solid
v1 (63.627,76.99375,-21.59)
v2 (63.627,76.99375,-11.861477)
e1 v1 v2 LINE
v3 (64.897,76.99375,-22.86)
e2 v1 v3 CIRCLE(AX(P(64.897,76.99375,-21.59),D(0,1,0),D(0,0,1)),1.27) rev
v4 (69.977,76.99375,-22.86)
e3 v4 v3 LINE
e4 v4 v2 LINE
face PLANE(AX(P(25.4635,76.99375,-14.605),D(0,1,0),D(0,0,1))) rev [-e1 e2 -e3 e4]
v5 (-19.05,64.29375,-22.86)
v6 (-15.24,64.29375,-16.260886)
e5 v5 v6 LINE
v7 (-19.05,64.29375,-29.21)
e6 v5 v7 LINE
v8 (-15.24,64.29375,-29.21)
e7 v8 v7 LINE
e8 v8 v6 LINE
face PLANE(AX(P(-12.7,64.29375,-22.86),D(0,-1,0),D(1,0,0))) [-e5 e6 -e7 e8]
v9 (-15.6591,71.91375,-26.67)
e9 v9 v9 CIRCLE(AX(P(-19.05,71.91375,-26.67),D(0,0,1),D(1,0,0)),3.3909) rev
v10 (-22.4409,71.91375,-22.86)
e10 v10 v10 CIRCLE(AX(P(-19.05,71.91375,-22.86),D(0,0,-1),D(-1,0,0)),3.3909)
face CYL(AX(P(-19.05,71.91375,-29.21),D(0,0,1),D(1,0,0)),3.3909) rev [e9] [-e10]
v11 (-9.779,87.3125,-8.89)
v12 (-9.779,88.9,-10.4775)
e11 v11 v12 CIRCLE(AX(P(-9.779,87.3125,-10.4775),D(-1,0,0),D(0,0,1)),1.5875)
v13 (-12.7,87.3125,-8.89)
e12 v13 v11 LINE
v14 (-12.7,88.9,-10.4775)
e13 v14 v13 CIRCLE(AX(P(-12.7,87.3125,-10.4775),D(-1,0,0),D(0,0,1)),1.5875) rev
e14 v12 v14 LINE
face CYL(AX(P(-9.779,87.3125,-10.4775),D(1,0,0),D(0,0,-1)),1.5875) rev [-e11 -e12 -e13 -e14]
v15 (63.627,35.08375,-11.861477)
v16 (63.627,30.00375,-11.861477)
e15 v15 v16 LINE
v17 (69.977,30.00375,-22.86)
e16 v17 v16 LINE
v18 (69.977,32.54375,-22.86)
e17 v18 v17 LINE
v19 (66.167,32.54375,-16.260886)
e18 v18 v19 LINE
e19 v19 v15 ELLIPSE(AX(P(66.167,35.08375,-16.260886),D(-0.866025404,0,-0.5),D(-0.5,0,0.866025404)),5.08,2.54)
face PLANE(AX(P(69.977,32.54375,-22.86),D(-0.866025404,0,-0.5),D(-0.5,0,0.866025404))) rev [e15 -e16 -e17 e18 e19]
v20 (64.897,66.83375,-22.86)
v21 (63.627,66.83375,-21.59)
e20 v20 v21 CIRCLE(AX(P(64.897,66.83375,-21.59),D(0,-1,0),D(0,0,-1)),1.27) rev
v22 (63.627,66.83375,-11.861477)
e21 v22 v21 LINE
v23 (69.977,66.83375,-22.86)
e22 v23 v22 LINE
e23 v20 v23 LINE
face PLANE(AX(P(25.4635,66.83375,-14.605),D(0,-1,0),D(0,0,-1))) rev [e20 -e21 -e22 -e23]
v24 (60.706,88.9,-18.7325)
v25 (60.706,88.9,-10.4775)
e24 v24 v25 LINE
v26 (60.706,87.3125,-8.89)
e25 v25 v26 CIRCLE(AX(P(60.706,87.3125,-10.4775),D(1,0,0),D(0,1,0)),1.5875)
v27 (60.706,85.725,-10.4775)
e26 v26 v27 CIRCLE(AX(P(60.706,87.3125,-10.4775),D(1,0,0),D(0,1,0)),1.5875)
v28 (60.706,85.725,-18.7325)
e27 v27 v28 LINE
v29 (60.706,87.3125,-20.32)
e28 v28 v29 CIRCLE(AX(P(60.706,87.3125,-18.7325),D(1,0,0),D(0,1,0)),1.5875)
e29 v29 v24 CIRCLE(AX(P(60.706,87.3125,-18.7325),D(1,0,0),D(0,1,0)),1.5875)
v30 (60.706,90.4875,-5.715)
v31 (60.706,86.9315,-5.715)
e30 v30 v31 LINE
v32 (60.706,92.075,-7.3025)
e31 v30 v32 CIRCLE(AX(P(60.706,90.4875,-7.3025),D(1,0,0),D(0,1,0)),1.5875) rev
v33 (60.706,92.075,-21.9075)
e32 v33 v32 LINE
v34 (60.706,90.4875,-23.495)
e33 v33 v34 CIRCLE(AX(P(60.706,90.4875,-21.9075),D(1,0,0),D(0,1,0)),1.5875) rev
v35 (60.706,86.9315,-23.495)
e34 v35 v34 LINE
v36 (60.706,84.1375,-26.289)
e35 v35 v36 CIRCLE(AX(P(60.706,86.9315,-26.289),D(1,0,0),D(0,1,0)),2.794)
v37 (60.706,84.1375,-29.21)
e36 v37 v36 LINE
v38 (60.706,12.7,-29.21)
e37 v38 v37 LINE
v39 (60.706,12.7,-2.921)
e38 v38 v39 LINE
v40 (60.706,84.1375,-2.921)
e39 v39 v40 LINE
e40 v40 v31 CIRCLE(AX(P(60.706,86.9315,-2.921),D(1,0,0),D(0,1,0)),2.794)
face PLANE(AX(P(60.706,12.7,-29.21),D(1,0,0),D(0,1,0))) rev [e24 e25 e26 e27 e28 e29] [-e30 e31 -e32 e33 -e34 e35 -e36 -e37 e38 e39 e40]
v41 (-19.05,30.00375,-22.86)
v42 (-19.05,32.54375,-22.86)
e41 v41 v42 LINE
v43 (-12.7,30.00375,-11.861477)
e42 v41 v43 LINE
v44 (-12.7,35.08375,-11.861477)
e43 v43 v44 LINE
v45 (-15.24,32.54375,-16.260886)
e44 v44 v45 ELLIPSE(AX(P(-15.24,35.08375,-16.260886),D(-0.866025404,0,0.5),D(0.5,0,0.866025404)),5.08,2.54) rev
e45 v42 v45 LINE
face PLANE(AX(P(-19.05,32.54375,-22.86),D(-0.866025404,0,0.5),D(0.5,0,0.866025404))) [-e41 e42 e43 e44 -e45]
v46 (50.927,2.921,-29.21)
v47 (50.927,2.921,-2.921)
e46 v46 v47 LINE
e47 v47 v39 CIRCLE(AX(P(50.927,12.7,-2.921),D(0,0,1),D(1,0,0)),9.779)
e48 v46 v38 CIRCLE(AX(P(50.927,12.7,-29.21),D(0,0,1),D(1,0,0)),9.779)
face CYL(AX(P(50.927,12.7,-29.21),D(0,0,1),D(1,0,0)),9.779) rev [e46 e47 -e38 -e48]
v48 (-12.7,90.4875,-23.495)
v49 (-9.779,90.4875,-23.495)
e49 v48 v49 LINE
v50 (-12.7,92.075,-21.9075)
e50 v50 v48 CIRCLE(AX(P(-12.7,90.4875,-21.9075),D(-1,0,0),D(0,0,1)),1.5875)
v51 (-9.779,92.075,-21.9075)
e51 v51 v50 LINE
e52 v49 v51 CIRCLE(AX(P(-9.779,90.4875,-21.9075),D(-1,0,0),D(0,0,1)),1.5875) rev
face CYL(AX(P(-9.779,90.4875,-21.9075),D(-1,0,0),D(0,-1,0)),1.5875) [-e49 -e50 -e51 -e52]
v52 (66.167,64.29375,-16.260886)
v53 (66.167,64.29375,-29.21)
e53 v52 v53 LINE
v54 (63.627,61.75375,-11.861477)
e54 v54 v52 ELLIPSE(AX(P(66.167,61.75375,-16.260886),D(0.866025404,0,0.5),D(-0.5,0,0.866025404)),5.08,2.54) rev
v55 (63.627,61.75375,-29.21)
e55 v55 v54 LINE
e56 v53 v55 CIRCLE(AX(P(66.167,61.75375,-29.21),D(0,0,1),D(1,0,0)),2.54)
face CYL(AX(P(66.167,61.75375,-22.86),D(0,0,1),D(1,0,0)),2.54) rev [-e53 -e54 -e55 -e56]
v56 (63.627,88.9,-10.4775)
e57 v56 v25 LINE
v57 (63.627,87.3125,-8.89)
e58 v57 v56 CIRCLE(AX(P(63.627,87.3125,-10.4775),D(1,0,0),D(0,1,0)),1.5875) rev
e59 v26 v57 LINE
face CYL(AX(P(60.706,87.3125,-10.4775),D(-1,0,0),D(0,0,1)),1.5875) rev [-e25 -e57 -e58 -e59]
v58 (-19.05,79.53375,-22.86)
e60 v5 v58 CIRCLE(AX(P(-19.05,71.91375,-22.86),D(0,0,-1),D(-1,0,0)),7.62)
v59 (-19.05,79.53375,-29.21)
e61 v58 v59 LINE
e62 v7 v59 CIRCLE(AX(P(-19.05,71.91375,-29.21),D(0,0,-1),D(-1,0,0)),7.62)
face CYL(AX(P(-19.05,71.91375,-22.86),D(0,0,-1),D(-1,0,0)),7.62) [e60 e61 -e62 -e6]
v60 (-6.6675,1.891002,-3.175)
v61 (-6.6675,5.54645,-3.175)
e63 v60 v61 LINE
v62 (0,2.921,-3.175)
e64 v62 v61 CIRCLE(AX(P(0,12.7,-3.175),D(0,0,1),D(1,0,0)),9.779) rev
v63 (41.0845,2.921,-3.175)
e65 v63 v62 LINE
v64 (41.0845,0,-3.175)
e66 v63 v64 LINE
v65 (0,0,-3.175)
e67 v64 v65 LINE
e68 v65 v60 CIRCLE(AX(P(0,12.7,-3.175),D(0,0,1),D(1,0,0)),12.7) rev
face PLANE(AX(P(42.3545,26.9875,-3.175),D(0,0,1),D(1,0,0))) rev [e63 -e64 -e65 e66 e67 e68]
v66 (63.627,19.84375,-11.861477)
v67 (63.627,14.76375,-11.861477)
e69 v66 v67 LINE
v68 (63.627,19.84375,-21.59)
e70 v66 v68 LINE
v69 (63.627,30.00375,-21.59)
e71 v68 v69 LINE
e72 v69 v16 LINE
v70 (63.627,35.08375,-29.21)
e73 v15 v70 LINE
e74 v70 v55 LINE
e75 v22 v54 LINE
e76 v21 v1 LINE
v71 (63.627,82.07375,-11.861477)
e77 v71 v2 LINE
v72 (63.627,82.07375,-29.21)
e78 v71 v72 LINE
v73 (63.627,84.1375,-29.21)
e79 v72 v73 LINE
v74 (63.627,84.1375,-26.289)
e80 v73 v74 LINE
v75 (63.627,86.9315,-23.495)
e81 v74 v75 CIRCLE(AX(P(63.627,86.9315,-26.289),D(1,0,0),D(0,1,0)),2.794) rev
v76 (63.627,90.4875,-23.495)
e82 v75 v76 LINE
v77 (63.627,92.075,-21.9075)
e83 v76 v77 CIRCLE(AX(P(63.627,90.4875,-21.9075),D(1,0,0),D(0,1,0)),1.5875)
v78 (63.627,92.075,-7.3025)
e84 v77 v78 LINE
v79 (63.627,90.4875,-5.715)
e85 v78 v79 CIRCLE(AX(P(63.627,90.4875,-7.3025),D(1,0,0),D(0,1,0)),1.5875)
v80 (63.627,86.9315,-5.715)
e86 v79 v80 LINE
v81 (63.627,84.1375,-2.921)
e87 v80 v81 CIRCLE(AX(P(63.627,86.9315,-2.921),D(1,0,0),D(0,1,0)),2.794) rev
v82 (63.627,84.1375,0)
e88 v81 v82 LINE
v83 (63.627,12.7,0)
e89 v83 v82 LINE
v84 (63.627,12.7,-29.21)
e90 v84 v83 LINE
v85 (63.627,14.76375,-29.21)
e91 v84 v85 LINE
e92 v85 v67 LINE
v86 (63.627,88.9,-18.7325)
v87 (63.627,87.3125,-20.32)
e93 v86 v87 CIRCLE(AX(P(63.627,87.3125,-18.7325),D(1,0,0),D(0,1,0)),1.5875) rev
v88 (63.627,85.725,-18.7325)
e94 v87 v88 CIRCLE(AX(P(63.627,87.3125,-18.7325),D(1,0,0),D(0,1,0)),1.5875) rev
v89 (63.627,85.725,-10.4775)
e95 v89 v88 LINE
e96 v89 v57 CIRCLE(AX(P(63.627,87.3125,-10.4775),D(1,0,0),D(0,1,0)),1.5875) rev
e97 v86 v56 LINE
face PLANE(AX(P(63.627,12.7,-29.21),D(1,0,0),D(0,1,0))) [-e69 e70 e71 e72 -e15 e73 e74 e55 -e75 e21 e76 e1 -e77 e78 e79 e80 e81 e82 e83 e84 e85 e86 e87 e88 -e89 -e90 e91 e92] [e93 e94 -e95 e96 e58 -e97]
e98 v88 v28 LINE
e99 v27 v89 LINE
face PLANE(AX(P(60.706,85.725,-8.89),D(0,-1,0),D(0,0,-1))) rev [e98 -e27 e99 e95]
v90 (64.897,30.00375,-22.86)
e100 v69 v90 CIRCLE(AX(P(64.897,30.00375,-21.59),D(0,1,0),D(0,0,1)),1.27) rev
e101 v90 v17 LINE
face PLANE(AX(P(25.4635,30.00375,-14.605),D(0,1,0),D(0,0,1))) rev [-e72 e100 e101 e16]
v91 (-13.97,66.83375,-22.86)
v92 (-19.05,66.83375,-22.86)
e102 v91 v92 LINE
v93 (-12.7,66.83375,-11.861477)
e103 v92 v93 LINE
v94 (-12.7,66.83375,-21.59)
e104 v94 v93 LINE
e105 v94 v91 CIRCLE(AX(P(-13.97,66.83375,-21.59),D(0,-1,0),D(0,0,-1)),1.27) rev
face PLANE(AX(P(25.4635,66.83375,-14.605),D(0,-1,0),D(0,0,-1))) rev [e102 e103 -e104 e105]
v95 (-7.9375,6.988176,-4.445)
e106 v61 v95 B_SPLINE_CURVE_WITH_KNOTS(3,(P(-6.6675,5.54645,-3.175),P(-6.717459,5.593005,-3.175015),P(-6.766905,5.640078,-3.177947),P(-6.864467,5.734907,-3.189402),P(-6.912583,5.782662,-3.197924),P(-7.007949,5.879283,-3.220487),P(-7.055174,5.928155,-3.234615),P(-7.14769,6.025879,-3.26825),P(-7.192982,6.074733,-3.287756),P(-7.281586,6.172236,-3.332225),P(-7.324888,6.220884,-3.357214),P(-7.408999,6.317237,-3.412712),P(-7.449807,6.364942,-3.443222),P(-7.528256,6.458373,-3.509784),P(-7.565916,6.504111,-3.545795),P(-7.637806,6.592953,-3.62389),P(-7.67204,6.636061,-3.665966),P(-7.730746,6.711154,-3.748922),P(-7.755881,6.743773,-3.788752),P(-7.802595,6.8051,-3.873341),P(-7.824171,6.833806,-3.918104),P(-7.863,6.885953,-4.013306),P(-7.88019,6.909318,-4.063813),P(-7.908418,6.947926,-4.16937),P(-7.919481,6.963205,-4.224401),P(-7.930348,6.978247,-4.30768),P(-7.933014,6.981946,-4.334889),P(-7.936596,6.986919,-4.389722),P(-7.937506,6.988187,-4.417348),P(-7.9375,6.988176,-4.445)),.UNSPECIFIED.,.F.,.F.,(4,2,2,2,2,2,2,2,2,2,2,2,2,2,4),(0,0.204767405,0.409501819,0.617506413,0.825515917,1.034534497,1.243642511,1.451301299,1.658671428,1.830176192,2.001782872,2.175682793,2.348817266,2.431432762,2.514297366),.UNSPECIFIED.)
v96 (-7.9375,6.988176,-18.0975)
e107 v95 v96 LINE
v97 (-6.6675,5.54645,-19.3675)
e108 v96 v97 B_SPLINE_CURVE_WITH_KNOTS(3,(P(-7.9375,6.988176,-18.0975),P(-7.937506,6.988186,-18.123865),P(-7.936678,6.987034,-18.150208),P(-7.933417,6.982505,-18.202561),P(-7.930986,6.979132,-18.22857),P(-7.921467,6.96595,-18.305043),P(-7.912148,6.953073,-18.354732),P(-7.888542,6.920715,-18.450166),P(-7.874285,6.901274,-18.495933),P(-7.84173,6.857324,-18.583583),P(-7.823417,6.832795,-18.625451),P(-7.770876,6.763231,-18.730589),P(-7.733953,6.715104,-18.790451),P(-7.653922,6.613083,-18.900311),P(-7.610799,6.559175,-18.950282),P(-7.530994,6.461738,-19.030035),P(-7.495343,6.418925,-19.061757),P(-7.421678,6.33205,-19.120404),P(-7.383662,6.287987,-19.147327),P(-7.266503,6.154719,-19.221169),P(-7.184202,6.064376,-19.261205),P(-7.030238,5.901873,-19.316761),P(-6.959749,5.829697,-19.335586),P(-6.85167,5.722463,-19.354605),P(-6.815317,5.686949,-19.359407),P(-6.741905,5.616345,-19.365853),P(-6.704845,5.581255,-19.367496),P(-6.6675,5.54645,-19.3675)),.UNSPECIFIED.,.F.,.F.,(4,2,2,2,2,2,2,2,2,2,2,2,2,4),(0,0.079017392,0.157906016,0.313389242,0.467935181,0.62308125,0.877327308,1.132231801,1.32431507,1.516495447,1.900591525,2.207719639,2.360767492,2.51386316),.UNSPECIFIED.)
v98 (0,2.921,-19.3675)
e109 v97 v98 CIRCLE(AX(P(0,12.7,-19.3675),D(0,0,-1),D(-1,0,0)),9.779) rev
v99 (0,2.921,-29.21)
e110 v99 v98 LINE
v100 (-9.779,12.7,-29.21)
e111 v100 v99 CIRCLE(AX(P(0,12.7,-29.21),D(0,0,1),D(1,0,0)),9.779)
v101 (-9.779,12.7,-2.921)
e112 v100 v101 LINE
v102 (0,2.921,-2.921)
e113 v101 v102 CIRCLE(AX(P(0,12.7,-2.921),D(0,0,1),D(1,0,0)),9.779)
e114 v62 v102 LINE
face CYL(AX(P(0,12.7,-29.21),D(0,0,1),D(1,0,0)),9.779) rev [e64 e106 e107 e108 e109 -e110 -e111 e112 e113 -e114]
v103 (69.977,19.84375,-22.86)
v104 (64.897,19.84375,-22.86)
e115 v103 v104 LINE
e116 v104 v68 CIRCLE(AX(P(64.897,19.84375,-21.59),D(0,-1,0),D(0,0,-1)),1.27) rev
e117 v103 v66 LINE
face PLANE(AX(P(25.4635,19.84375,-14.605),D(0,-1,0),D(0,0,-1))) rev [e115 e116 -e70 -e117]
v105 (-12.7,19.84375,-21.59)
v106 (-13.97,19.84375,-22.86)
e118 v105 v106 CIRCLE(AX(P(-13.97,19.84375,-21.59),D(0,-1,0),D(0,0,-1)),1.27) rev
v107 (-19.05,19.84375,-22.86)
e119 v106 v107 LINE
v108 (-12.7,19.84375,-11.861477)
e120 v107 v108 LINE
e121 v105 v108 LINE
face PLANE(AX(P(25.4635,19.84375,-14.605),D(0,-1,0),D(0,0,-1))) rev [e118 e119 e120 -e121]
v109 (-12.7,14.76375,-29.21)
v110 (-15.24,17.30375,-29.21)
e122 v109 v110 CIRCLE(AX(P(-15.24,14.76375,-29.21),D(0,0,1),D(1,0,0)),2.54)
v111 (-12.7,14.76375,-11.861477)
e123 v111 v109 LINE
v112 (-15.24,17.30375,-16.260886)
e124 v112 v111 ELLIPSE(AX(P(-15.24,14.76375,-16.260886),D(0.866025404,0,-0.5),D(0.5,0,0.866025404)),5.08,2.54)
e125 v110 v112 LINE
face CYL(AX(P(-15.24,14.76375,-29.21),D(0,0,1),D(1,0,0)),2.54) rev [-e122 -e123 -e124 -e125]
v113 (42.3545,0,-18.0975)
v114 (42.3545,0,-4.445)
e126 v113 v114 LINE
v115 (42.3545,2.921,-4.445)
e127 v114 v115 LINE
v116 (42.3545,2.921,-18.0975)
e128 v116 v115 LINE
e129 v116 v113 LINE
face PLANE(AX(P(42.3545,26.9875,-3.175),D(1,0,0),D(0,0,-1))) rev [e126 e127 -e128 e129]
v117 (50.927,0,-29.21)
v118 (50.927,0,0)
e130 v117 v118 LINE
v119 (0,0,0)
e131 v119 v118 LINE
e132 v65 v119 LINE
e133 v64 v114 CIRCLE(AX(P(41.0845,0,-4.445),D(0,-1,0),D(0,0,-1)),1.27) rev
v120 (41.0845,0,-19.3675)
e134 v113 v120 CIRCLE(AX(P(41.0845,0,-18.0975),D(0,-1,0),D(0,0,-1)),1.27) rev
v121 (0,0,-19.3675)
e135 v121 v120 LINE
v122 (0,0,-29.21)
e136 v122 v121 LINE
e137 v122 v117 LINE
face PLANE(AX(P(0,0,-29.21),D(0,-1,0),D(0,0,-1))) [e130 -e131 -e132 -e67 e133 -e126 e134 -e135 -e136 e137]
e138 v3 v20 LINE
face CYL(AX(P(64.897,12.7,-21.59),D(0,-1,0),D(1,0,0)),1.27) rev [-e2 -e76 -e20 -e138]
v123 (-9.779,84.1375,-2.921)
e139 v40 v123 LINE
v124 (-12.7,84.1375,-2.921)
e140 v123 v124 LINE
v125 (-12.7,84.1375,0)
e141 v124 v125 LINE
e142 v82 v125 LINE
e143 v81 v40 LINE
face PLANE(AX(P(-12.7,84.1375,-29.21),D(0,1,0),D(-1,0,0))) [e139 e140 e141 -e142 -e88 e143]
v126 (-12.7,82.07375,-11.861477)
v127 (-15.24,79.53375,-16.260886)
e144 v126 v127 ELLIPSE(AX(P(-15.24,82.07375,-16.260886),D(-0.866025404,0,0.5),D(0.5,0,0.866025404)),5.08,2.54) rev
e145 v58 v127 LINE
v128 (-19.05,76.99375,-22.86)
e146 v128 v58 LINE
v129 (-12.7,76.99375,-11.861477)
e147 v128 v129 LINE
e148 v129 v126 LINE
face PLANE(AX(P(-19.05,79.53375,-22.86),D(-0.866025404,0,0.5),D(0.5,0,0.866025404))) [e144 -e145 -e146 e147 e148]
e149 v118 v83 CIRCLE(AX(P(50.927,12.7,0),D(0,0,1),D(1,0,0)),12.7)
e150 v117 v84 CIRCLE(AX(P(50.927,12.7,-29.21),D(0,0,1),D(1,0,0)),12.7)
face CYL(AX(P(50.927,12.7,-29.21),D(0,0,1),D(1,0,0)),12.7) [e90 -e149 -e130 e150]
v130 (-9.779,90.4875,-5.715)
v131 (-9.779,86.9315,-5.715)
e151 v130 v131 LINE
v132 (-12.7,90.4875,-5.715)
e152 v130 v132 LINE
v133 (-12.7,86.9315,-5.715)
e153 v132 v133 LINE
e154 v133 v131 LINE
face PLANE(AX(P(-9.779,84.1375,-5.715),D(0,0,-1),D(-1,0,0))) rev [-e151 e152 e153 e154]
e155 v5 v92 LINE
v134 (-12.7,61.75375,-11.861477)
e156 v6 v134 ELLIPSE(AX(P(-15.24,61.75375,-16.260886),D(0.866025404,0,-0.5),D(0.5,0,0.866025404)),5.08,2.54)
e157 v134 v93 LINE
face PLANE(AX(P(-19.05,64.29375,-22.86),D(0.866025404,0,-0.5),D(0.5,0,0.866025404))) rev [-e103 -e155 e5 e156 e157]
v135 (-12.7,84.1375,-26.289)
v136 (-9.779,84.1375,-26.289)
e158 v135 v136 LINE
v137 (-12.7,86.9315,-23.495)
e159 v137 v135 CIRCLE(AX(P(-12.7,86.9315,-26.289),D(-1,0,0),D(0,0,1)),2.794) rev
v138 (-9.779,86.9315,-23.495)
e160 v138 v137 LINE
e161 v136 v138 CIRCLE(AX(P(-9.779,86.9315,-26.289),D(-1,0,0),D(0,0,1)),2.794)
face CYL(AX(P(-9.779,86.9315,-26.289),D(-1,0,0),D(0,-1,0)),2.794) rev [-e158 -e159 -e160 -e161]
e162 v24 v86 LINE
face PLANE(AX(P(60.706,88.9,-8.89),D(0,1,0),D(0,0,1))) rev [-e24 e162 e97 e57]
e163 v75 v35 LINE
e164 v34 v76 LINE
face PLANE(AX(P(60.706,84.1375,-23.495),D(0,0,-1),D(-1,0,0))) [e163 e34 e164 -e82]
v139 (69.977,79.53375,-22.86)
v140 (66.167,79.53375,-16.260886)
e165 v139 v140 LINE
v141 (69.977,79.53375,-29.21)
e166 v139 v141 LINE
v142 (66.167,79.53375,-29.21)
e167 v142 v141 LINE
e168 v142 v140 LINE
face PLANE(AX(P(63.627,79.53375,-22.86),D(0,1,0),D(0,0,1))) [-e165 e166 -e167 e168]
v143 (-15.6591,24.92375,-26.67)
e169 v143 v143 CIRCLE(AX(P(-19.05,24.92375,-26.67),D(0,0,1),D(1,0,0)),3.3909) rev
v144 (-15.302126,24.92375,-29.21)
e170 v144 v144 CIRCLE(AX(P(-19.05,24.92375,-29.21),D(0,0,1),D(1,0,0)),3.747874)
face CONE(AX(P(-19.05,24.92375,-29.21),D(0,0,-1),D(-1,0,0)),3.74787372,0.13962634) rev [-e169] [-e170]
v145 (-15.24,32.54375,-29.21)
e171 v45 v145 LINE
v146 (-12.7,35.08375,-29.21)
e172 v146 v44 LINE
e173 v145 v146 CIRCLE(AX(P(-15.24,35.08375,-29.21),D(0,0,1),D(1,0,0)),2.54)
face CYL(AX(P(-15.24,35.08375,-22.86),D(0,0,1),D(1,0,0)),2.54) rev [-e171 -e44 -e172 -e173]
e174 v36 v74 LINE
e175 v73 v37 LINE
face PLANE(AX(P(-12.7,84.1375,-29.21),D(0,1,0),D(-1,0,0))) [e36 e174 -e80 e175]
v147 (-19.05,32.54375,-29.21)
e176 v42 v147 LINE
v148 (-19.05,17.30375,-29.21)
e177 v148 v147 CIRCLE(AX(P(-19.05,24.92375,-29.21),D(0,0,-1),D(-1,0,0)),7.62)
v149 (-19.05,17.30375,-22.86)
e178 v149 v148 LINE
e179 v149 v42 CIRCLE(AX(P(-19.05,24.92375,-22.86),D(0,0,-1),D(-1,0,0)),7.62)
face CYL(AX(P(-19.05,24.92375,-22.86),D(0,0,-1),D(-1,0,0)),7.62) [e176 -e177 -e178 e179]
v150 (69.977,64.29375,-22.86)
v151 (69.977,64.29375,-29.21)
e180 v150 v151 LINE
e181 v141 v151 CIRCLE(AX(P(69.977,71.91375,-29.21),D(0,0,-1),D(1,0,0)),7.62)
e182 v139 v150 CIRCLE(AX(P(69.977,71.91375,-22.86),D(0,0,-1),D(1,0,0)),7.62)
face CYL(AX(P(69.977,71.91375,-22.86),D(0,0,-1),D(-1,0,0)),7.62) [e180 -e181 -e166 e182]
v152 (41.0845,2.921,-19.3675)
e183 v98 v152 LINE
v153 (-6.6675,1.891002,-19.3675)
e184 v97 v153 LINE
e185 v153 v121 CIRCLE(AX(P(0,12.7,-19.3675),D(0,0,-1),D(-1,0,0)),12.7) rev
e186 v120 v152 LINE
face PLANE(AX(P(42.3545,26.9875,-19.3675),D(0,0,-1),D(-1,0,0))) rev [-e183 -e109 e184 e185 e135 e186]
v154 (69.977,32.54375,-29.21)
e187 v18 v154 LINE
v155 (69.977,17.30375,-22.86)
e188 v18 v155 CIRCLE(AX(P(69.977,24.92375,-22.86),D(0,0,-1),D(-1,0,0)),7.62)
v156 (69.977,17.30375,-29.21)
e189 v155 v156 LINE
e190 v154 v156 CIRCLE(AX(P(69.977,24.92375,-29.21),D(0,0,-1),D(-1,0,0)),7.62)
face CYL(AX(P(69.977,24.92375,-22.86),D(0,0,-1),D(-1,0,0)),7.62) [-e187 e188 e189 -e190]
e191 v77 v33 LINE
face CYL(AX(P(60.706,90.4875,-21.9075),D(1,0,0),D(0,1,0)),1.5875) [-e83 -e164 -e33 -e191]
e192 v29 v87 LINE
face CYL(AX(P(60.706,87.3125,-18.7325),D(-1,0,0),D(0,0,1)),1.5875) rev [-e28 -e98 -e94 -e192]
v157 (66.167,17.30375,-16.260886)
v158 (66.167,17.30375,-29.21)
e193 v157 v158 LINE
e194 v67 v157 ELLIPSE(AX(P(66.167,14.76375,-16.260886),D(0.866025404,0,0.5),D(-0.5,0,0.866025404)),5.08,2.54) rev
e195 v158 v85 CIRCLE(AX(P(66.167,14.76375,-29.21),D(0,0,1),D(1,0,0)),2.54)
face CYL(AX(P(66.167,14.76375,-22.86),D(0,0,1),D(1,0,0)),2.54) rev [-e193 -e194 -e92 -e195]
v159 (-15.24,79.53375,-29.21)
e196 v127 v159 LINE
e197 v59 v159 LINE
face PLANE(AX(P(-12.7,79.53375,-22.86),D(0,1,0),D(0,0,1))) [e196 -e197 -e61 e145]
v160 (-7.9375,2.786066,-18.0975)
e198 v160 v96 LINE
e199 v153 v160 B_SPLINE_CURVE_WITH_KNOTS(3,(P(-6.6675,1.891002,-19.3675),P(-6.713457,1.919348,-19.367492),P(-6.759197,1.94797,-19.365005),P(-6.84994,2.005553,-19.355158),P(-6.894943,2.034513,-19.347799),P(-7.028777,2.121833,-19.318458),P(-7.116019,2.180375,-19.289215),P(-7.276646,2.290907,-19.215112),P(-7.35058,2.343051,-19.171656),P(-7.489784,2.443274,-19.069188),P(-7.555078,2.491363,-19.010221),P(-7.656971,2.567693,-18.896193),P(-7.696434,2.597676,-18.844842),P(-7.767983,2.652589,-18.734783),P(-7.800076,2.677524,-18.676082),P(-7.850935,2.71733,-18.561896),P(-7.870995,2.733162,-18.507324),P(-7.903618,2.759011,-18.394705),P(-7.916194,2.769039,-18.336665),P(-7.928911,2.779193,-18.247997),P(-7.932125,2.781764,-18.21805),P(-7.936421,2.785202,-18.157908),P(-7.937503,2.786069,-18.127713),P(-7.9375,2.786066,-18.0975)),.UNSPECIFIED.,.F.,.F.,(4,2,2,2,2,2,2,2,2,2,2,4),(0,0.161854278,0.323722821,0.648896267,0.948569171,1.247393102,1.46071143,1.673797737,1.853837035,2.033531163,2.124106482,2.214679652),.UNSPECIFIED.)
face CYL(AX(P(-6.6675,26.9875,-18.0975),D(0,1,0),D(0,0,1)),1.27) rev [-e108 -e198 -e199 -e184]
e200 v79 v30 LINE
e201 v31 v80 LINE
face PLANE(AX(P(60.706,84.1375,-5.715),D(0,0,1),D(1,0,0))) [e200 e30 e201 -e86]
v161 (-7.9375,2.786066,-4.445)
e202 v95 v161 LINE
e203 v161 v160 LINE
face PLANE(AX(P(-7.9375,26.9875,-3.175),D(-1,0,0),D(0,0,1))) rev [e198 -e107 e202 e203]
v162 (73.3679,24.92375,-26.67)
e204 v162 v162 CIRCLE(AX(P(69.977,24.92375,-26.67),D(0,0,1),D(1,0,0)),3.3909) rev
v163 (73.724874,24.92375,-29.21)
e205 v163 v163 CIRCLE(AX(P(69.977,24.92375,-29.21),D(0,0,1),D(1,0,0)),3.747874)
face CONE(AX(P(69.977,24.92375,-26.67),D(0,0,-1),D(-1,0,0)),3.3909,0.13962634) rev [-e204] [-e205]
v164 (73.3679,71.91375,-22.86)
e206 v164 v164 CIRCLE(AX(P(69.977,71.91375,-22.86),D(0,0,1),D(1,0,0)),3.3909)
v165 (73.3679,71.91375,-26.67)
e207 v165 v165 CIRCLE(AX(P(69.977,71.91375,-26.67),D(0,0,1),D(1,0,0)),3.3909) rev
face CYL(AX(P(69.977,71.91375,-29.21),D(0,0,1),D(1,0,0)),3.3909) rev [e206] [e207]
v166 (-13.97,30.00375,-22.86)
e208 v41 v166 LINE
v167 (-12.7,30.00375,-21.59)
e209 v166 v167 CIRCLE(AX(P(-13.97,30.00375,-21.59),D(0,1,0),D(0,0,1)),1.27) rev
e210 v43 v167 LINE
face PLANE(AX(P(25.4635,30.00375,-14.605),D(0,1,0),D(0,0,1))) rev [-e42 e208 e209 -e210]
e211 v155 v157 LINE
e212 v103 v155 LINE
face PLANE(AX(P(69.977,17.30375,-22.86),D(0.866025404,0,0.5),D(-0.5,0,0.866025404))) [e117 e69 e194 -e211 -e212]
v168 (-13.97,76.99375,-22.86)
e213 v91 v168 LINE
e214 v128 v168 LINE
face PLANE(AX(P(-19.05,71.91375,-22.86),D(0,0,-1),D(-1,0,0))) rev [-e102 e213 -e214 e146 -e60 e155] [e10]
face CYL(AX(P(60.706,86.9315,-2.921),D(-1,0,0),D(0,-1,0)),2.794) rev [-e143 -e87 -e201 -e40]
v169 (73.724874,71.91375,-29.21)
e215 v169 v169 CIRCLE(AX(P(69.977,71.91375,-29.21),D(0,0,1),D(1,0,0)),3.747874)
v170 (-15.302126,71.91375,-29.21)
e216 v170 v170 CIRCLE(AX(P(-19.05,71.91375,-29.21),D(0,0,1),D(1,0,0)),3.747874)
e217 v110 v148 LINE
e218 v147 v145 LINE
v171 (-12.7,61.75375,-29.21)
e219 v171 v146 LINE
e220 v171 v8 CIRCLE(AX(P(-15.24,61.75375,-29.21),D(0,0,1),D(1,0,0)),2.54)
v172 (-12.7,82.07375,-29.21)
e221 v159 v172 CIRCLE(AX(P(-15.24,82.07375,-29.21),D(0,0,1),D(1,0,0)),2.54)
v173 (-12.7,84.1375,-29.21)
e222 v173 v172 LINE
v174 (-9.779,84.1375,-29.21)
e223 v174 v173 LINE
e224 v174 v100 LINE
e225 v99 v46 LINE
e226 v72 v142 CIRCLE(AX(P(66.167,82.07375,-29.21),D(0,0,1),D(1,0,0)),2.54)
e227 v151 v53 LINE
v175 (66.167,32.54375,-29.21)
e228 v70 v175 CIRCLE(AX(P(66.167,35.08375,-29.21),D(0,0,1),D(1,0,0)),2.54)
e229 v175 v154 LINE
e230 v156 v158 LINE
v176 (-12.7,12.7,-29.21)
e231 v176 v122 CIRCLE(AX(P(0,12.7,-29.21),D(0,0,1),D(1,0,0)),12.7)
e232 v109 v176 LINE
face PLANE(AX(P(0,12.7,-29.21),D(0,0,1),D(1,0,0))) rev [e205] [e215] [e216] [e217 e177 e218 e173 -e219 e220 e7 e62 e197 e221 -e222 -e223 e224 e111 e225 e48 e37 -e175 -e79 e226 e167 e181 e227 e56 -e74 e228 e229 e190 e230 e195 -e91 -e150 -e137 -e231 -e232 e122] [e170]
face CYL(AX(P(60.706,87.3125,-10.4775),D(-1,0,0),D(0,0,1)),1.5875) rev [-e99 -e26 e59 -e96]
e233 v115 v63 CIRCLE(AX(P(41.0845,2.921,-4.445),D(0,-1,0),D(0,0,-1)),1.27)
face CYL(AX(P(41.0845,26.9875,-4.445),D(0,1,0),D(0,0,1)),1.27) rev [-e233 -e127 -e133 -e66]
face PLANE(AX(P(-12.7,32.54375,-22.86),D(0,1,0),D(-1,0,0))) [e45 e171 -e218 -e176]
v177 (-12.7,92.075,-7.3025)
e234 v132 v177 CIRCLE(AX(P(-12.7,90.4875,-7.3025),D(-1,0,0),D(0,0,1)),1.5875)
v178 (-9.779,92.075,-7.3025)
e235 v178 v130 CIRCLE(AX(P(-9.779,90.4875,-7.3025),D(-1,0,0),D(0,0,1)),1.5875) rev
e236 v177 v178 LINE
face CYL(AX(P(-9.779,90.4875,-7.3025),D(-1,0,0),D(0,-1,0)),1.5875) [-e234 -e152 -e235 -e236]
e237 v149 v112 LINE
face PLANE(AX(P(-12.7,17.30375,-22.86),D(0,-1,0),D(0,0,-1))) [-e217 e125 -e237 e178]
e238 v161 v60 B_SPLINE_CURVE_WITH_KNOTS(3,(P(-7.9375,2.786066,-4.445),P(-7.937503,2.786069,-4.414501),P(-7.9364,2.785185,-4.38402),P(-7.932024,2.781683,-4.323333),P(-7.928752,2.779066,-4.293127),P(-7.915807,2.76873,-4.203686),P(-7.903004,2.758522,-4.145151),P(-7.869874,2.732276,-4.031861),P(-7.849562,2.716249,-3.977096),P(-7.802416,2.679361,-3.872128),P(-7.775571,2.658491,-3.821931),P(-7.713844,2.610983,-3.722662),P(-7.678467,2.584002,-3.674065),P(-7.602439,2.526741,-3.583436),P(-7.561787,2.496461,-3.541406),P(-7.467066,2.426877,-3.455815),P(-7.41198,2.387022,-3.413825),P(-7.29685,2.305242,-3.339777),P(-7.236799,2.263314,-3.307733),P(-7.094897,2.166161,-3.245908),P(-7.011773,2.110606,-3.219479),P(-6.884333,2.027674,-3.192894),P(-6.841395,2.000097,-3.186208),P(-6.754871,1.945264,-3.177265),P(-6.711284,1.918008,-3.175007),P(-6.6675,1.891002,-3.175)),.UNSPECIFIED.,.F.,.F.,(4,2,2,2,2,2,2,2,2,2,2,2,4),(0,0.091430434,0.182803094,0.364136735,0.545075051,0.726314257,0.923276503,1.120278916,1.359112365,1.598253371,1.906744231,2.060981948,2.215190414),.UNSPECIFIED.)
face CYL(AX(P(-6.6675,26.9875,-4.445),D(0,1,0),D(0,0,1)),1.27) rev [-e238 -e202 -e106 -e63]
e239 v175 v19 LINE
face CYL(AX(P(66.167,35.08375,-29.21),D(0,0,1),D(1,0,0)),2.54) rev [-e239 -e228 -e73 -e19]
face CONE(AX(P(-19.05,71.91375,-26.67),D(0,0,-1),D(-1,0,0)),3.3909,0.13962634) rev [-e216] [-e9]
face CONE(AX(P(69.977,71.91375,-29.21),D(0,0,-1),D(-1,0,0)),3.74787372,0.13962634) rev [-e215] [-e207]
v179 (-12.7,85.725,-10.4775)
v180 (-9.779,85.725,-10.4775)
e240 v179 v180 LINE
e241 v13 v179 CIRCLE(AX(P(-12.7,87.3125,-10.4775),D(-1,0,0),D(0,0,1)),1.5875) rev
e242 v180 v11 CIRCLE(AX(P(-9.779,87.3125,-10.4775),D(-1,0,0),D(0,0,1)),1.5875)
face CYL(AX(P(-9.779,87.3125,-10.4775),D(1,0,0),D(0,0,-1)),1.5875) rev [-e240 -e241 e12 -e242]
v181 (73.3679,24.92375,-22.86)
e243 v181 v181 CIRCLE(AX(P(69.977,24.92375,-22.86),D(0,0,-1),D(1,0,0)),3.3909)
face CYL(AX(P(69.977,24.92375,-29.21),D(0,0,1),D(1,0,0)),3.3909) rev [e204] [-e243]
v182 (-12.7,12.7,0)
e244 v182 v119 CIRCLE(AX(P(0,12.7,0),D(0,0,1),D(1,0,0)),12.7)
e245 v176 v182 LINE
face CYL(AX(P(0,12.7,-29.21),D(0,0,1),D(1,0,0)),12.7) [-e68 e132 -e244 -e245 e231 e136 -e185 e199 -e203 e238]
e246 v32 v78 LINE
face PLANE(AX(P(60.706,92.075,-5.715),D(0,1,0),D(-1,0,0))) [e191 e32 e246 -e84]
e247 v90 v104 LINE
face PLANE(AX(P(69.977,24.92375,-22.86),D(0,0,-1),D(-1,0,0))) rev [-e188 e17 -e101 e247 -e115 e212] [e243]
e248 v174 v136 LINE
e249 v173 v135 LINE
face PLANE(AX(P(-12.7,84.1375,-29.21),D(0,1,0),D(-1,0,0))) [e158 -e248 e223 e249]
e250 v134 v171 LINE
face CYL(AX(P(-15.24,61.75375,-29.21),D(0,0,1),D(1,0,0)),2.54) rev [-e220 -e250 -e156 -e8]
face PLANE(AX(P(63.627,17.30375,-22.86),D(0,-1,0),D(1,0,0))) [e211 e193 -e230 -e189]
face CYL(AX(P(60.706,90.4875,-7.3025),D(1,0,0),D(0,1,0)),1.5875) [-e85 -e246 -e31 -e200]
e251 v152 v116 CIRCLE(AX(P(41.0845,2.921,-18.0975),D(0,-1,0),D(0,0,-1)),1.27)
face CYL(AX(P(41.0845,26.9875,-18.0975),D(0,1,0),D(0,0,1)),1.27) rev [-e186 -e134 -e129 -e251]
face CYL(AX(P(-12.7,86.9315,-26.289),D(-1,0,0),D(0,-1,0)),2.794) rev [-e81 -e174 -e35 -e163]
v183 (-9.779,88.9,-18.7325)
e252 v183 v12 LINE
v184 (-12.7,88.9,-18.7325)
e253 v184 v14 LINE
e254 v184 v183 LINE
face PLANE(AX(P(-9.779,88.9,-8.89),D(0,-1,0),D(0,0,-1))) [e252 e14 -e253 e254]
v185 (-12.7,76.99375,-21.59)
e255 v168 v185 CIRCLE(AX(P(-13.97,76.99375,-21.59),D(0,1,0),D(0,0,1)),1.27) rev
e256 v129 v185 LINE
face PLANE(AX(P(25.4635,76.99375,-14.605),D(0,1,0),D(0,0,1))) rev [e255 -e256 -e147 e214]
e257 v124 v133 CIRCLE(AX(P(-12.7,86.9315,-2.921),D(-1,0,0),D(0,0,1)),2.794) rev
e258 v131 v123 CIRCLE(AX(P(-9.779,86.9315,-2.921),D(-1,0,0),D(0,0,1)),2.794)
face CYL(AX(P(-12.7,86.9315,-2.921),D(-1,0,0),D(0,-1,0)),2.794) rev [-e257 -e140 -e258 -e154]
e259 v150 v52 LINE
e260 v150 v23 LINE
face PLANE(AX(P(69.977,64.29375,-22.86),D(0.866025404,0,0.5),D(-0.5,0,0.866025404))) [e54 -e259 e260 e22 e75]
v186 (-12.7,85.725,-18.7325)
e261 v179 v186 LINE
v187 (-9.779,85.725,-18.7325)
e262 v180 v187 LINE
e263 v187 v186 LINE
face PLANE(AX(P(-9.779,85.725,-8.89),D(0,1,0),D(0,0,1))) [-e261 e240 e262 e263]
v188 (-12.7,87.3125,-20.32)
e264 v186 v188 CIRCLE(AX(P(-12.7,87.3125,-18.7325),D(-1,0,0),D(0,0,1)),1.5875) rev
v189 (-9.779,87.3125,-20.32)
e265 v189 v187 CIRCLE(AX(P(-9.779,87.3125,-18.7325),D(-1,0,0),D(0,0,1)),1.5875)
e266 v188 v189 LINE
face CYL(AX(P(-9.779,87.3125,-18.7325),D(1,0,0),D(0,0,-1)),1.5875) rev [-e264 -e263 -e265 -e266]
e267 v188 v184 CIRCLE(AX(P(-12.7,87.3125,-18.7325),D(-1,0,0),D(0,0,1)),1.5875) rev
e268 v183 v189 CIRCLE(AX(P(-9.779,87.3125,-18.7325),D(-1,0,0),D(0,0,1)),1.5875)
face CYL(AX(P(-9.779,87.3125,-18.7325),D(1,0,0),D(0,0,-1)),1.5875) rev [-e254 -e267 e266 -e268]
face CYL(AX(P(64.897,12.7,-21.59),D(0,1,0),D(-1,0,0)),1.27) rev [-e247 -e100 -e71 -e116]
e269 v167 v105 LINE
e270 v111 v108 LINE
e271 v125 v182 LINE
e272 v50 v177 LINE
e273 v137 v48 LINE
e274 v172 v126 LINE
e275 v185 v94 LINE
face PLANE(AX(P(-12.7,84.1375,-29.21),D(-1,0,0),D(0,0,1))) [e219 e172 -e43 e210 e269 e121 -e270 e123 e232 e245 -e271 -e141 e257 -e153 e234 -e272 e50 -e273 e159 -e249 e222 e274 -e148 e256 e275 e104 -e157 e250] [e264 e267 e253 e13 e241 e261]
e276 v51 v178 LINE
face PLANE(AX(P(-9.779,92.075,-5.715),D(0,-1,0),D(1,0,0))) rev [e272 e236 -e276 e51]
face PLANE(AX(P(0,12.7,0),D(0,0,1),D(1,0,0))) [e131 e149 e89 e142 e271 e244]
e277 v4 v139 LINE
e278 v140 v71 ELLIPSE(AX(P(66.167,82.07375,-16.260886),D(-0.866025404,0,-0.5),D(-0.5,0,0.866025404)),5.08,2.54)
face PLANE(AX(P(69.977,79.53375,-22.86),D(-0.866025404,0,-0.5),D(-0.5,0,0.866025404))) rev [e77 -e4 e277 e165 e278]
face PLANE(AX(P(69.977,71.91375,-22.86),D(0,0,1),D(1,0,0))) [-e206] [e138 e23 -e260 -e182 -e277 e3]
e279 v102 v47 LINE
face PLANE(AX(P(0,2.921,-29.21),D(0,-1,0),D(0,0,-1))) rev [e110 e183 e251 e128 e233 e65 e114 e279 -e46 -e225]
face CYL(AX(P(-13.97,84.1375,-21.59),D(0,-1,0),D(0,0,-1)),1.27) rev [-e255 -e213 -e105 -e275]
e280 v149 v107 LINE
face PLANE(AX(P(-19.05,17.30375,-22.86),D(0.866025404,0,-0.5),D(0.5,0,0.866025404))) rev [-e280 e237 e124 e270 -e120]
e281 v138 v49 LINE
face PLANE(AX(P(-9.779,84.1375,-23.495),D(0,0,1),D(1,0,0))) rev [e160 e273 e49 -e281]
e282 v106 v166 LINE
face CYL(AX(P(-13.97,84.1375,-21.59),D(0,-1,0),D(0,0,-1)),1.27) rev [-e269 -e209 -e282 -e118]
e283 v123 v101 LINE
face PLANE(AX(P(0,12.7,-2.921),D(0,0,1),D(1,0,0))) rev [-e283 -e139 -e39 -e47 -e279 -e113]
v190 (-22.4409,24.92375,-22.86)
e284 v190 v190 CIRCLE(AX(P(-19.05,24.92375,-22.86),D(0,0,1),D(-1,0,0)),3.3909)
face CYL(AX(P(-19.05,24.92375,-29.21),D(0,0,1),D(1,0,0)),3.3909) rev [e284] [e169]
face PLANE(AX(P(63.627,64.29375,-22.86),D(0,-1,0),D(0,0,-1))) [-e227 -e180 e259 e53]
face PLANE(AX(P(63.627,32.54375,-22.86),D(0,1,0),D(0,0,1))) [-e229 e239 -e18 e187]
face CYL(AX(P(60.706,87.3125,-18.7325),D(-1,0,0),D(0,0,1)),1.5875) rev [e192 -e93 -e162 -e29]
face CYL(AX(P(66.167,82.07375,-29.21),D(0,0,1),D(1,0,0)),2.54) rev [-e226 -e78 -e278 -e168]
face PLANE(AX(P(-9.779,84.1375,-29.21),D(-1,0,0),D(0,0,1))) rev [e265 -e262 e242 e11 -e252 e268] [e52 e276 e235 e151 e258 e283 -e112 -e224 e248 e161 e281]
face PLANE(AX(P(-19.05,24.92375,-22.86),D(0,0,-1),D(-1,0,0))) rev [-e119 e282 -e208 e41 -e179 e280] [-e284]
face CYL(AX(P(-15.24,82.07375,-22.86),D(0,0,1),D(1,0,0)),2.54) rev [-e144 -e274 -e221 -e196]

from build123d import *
from OCP.BRepFilletAPI import BRepFilletAPI_MakeChamfer

# Parameters (mm, degrees)
BOSS_EXTRUDE1_DEPTH                        = 29.21
SHELL1_T                                   = -2.921
SKETCH3_W                                  = 50.292
SKETCH3_H                                  = 16.1925
CUT_EXTRUDE2_DEPTH                         = 26.9875
BOSS_EXTRUDE2_DEPTH                        = 6.35
FILLET3_R                                  = 1.27
FILLET4_R                                  = 1.27
RIB1_REACH                                 = 116.892
SKETCH6_WALL_W                             = 244.483688888
SKETCH6_WALL_H                             = 2.54
MIRROR2_COPY_1_REACH                       = 116.892
MIRROR2_COPY_1_SKETCH_W                    = 244.483688888
MIRROR2_COPY_1_SKETCH_H                    = 2.54
MIRROR3_COPY_1_REACH                       = 116.892
MIRROR3_COPY_1_SKETCH_W                    = 244.483688888
MIRROR3_COPY_1_SKETCH_H                    = 2.54
MIRROR3_COPY_2_REACH                       = 116.892
MIRROR3_COPY_2_SKETCH_W                    = 244.483688888
MIRROR3_COPY_2_SKETCH_H                    = 2.54
MIRROR3_COPY_3_REACH                       = 116.892
MIRROR3_COPY_3_SKETCH_W                    = 244.483688888
MIRROR3_COPY_3_SKETCH_H                    = 2.54
FILLET6_R                                  = 2.54
SKETCH7_R                                  = 3.3909
CUT_EXTRUDE3_DEPTH                         = 6.35
MIRROR4_AT_THE_SECOND_PLANE_COPY_1_SKETC_R = 3.3909
MIRROR4_AT_THE_SECOND_PLANE_COPY_1_DEPTH   = 6.35
CHAMFER1_SIZE                              = 2.54
CHAMFER1_SIZE2                             = 0.35697372
SKETCH10_W                                 = 17.78
SKETCH10_H                                 = 7.9375
BOSS_EXTRUDE3_DEPTH                        = 2.921
SKETCH11_W                                 = 11.43
SKETCH11_H                                 = 3.175
CUT_EXTRUDE4_DEPTH                         = 2.921
FILLET7_R                                  = 1.5875
FILLET7_OF_MIRROR5_R                       = 1.5875
FILLET8_R                                  = 2.794


with BuildPart() as part:
    # Sketch1 → Boss-Extrude1 (new body)
    with BuildSketch(Plane.XY):
        with BuildLine():
            Line((0, 0), (50.927, 0))
            ThreePointArc((50.927, 0), (59.907256121, 3.719743879), (63.627, 12.7))
            Line((63.627, 12.7), (63.627, 84.1375))
            Line((63.627, 84.1375), (-12.7, 84.1375))
            Line((-12.7, 84.1375), (-12.7, 12.7))
            ThreePointArc((-12.7, 12.7), (-8.980256121, 3.719743879), (0, 0))
        make_face()
    extrude(amount=-BOSS_EXTRUDE1_DEPTH)

    # Shell1
    shell1_openings = [part.faces().sort_by_distance(p)[0] for p in [
        (25.4635, 42.496263873, -29.21),
        (25.4635, 84.1375, -14.605),
    ]]
    offset(amount=SHELL1_T, openings=shell1_openings, kind=Kind.INTERSECTION)

    # Sketch3 → Cut-Extrude2 (cut)
    with BuildSketch(Plane(origin=(0, 0, 0), x_dir=(-1, 0, 0), z_dir=(0, -1, 0))):
        with Locations((-17.2085, 11.27125)):
            Rectangle(SKETCH3_W, SKETCH3_H)
    extrude(amount=-CUT_EXTRUDE2_DEPTH, mode=Mode.SUBTRACT)

    # Sketch4 → Boss-Extrude2 (add)
    with BuildSketch(Plane(origin=(0, 0, -29.21), x_dir=(-1, 0, 0), z_dir=(0, 0, -1))):
        with BuildLine():
            Line((12.7, 17.30375), (19.05, 17.30375))
            ThreePointArc((19.05, 17.30375), (26.67, 24.92375), (19.05, 32.54375))
            Line((19.05, 32.54375), (12.7, 32.54375))
            Line((12.7, 32.54375), (12.7, 17.30375))
        make_face()
        with BuildLine():
            Line((12.7, 79.53375), (19.05, 79.53375))
            ThreePointArc((19.05, 79.53375), (26.67, 71.91375), (19.05, 64.29375))
            Line((19.05, 64.29375), (12.7, 64.29375))
            Line((12.7, 64.29375), (12.7, 79.53375))
        make_face()
        with BuildLine():
            Line((-63.627, 79.53375), (-69.977, 79.53375))
            ThreePointArc((-69.977, 79.53375), (-77.597, 71.91375), (-69.977, 64.29375))
            Line((-69.977, 64.29375), (-63.627, 64.29375))
            Line((-63.627, 64.29375), (-63.627, 79.53375))
        make_face()
        with BuildLine():
            Line((-63.627, 32.54375), (-69.977, 32.54375))
            ThreePointArc((-69.977, 32.54375), (-77.597, 24.92375), (-69.977, 17.30375))
            Line((-69.977, 17.30375), (-63.627, 17.30375))
            Line((-63.627, 17.30375), (-63.627, 32.54375))
        make_face()
    extrude(amount=-BOSS_EXTRUDE2_DEPTH)

    # Fillet3
    fillet3_edges = [part.edges().sort_by_distance(p)[0] for p in [
        (-12.7, 24.92375, -22.86),
        (-12.7, 71.91375, -22.86),
        (63.627, 71.91375, -22.86),
        (63.627, 24.92375, -22.86),
    ]]
    fillet(fillet3_edges, radius=FILLET3_R)

    # Fillet4
    fillet4_edges = [part.edges().sort_by_distance(p)[0] for p in [
        (-7.9375, 4.88712078, -19.3675),
        (42.3545, 1.4605, -3.175),
        (42.3545, 1.4605, -19.3675),
        (-7.9375, 4.88712078, -3.175),
    ]]
    fillet(fillet4_edges, radius=FILLET4_R)

    # Sketch6 wall → Rib1 (add, up to next)
    with BuildSketch(Plane(origin=(66.802, 79.53375, -17.360738686), x_dir=(-0.500000000002, 0, 0.866025403783), z_dir=(0.866025403783, 0, 0.500000000002)), mode=Mode.PRIVATE) as rib1_sk1:
        with Locations((0, 1.27)):
            Rectangle(SKETCH6_WALL_W, SKETCH6_WALL_H)
    rib1_tool1 = extrude(rib1_sk1.sketch, amount=-RIB1_REACH, mode=Mode.PRIVATE) - part.part
    rib1 = rib1_tool1.solids().sort_by_distance((66.802, 79.53375, -17.360738686))[0]
    add(rib1)

    # Mirror1: Rib1 across plane
    add(rib1.mirror(Plane.ZX.offset(71.91375)))

    # Mirror2: Rib1 across plane
    add(rib1.mirror(Plane(origin=(0, 48.41875, 0), x_dir=(0, 0, 1), z_dir=(0, -1, 0))))

    # Mirror2 copy 1 sketch → Mirror2 copy 1 (add, up to next)
    with BuildSketch(Plane(origin=(66.802, 32.54375, -17.360738686), x_dir=(-0.500000000002, 0, 0.866025403783), z_dir=(0.866025403783, 0, 0.500000000002)), mode=Mode.PRIVATE) as mirror2_copy_1_sk1:
        with Locations((0, 1.27)):
            Rectangle(MIRROR2_COPY_1_SKETCH_W, MIRROR2_COPY_1_SKETCH_H)
    mirror2_copy_1_tool1 = extrude(mirror2_copy_1_sk1.sketch, amount=-MIRROR2_COPY_1_REACH, mode=Mode.PRIVATE) - part.part
    add(mirror2_copy_1_tool1.solids().sort_by_distance((66.802, 32.54375, -17.360738686))[0])

    # Mirror3: Rib1 across plane
    add(rib1.mirror(Plane(origin=(25.4635, 0, 0), x_dir=(0, 0, 1), z_dir=(1, 0, 0))))

    # Mirror3 copy 1 sketch → Mirror3 copy 1 (add, up to next)
    with BuildSketch(Plane(origin=(-15.875, 64.29375, -17.360738686), x_dir=(0.500000000002, 0, 0.866025403783), z_dir=(-0.866025403783, 0, 0.500000000002)), mode=Mode.PRIVATE) as mirror3_copy_1_sk1:
        with Locations((0, 1.27)):
            Rectangle(MIRROR3_COPY_1_SKETCH_W, MIRROR3_COPY_1_SKETCH_H)
    mirror3_copy_1_tool1 = extrude(mirror3_copy_1_sk1.sketch, amount=-MIRROR3_COPY_1_REACH, mode=Mode.PRIVATE) - part.part
    add(mirror3_copy_1_tool1.solids().sort_by_distance((-15.875, 64.29375, -17.360738686))[0])

    # Mirror3 copy 2 sketch → Mirror3 copy 2 (add, up to next)
    with BuildSketch(Plane(origin=(-15.875, 17.30375, -17.360738686), x_dir=(0.500000000002, 0, 0.866025403783), z_dir=(-0.866025403783, 0, 0.500000000002)), mode=Mode.PRIVATE) as mirror3_copy_2_sk1:
        with Locations((0, 1.27)):
            Rectangle(MIRROR3_COPY_2_SKETCH_W, MIRROR3_COPY_2_SKETCH_H)
    mirror3_copy_2_tool1 = extrude(mirror3_copy_2_sk1.sketch, amount=-MIRROR3_COPY_2_REACH, mode=Mode.PRIVATE) - part.part
    add(mirror3_copy_2_tool1.solids().sort_by_distance((-15.875, 17.30375, -17.360738686))[0])

    # Mirror3 copy 3 sketch → Mirror3 copy 3 (add, up to next)
    with BuildSketch(Plane(origin=(-15.875, 32.54375, -17.360738686), x_dir=(0.500000000002, 0, 0.866025403783), z_dir=(-0.866025403783, 0, 0.500000000002)), mode=Mode.PRIVATE) as mirror3_copy_3_sk1:
        with Locations((0, -1.27)):
            Rectangle(MIRROR3_COPY_3_SKETCH_W, MIRROR3_COPY_3_SKETCH_H)
    mirror3_copy_3_tool1 = extrude(mirror3_copy_3_sk1.sketch, amount=-MIRROR3_COPY_3_REACH, mode=Mode.PRIVATE) - part.part
    add(mirror3_copy_3_tool1.solids().sort_by_distance((-15.875, 32.54375, -17.360738686))[0])

    # Fillet6
    fillet6_edges = [part.edges().sort_by_distance(p)[0] for p in [
        (-12.7, 17.30375, -20.535738686),
        (-12.7, 32.54375, -20.535738686),
        (-12.7, 64.29375, -20.535738686),
        (-12.7, 79.53375, -20.535738686),
        (63.627, 79.53375, -20.535738686),
        (63.627, 64.29375, -20.535738686),
        (63.627, 32.54375, -20.535738686),
        (63.627, 17.30375, -20.535738686),
    ]]
    fillet(fillet6_edges, radius=FILLET6_R)

    # Sketch7 → Cut-Extrude3 (cut)
    with BuildSketch(Plane.XY.offset(-22.86)):
        with Locations((69.977, 71.91375)):
            Circle(SKETCH7_R)
    cut_extrude3 = extrude(amount=-CUT_EXTRUDE3_DEPTH, mode=Mode.SUBTRACT)

    # Mirror4: Cut-Extrude3 across plane
    add(cut_extrude3.mirror(Plane(origin=(25.4635, 0, 0), x_dir=(0, 0, 1), z_dir=(1, 0, 0))), mode=Mode.SUBTRACT)

    # Mirror4 at the second plane: Cut-Extrude3 across plane
    add(cut_extrude3.mirror(Plane(origin=(0, 48.41875, 0), x_dir=(0, 0, 1), z_dir=(0, -1, 0))), mode=Mode.SUBTRACT)

    # Mirror4 at the second plane copy 1 sketc → Mirror4 at the second plane copy 1 (cut)
    with BuildSketch(Plane(origin=(50.927, 96.8375, -22.86), x_dir=(-1, 0, 0), z_dir=(0, 0, 1))):
        with Locations((69.977, 71.91375)):
            Circle(MIRROR4_AT_THE_SECOND_PLANE_COPY_1_SKETC_R)
    extrude(amount=-MIRROR4_AT_THE_SECOND_PLANE_COPY_1_DEPTH, mode=Mode.SUBTRACT)

    # Chamfer1: one chamfer whose edges measure the first distance from different faces: ONE call of the kernel's chamfer builder (chamfer() names one face for all edges)
    chamfer1_edges_1 = [part.edges().sort_by_distance(p)[0] for p in [
        (66.5861, 71.91375, -29.21),
    ]]
    chamfer1_side_1 = [part.faces().sort_by_distance(p)[0] for p in [
        (66.5861, 71.91375, -26.035),
    ]]
    chamfer1_edges_2 = [part.edges().sort_by_distance(p)[0] for p in [
        (66.5861, 24.92375, -29.21),
    ]]
    chamfer1_side_2 = [part.faces().sort_by_distance(p)[0] for p in [
        (66.5861, 24.92375, -26.035),
    ]]
    chamfer1_edges_3 = [part.edges().sort_by_distance(p)[0] for p in [
        (-15.6591, 71.91375, -29.21),
    ]]
    chamfer1_side_3 = [part.faces().sort_by_distance(p)[0] for p in [
        (-15.6591, 71.91375, -26.035),
    ]]
    chamfer1_edges_4 = [part.edges().sort_by_distance(p)[0] for p in [
        (-15.6591, 24.92375, -29.21),
    ]]
    chamfer1_side_4 = [part.faces().sort_by_distance(p)[0] for p in [
        (-15.6591, 24.92375, -26.035),
    ]]
    chamfer1 = BRepFilletAPI_MakeChamfer(part.part.solid().wrapped)
    for e in chamfer1_edges_1:
        chamfer1.Add(CHAMFER1_SIZE, CHAMFER1_SIZE2, e.wrapped, chamfer1_side_1[0].wrapped)  # the first distance lies on this face
    for e in chamfer1_edges_2:
        chamfer1.Add(CHAMFER1_SIZE, CHAMFER1_SIZE2, e.wrapped, chamfer1_side_2[0].wrapped)  # the first distance lies on this face
    for e in chamfer1_edges_3:
        chamfer1.Add(CHAMFER1_SIZE, CHAMFER1_SIZE2, e.wrapped, chamfer1_side_3[0].wrapped)  # the first distance lies on this face
    for e in chamfer1_edges_4:
        chamfer1.Add(CHAMFER1_SIZE, CHAMFER1_SIZE2, e.wrapped, chamfer1_side_4[0].wrapped)  # the first distance lies on this face
    add(Compound.cast(chamfer1.Shape()), mode=Mode.REPLACE)

    # Sketch10 → Boss-Extrude3 (add)
    with BuildSketch(Plane(origin=(63.627, 0, 0), x_dir=(0, 0, -1), z_dir=(1, 0, 0))):
        with Locations((14.605, 88.10625)):
            Rectangle(SKETCH10_W, SKETCH10_H)
    boss_extrude3 = extrude(amount=-BOSS_EXTRUDE3_DEPTH)

    # Sketch11 → Cut-Extrude4 (cut)
    with BuildSketch(Plane(origin=(63.627, 0, 0), x_dir=(0, 0, -1), z_dir=(1, 0, 0))):
        with Locations((14.605, 87.3125)):
            Rectangle(SKETCH11_W, SKETCH11_H)
    cut_extrude4 = extrude(amount=-CUT_EXTRUDE4_DEPTH, mode=Mode.SUBTRACT)

    # Fillet7
    fillet7_edges = [part.edges().sort_by_distance(p)[0] for p in [
        (62.1665, 85.725, -8.89),
        (62.1665, 88.9, -8.89),
        (62.1665, 88.9, -20.32),
        (62.1665, 85.725, -20.32),
        (62.1665, 92.075, -23.495),
        (62.1665, 92.075, -5.715),
    ]]
    fillet(fillet7_edges, radius=FILLET7_R - 0.0001)  # a hair under: the kernel refuses the full size

    # Mirror5: Boss-Extrude3, Cut-Extrude4 across plane
    add(boss_extrude3.mirror(Plane(origin=(25.4635, 0, 0), x_dir=(0, 0, 1), z_dir=(1, 0, 0))))
    add(cut_extrude4.mirror(Plane(origin=(25.4635, 0, 0), x_dir=(0, 0, 1), z_dir=(1, 0, 0))), mode=Mode.SUBTRACT)

    # Fillet7 of Mirror5
    fillet7_of_mirror5_edges = [part.edges().sort_by_distance(p)[0] for p in [
        (-11.2395, 85.725, -8.89),
        (-11.2395, 88.9, -8.89),
        (-11.2395, 88.9, -20.32),
        (-11.2395, 85.725, -20.32),
        (-11.2395, 92.075, -23.495),
        (-11.2395, 92.075, -5.715),
    ]]
    fillet(fillet7_of_mirror5_edges, radius=FILLET7_OF_MIRROR5_R - 0.0001)  # a hair under: the kernel refuses the full size

    # Fillet8
    fillet8_edges = [part.edges().sort_by_distance(p)[0] for p in [
        (62.1665, 84.1375, -5.715),
        (62.1665, 84.1375, -23.495),
        (-11.2395, 84.1375, -5.715),
        (-11.2395, 84.1375, -23.495),
    ]]
    fillet(fillet8_edges, radius=FILLET8_R)


solid = part.part
